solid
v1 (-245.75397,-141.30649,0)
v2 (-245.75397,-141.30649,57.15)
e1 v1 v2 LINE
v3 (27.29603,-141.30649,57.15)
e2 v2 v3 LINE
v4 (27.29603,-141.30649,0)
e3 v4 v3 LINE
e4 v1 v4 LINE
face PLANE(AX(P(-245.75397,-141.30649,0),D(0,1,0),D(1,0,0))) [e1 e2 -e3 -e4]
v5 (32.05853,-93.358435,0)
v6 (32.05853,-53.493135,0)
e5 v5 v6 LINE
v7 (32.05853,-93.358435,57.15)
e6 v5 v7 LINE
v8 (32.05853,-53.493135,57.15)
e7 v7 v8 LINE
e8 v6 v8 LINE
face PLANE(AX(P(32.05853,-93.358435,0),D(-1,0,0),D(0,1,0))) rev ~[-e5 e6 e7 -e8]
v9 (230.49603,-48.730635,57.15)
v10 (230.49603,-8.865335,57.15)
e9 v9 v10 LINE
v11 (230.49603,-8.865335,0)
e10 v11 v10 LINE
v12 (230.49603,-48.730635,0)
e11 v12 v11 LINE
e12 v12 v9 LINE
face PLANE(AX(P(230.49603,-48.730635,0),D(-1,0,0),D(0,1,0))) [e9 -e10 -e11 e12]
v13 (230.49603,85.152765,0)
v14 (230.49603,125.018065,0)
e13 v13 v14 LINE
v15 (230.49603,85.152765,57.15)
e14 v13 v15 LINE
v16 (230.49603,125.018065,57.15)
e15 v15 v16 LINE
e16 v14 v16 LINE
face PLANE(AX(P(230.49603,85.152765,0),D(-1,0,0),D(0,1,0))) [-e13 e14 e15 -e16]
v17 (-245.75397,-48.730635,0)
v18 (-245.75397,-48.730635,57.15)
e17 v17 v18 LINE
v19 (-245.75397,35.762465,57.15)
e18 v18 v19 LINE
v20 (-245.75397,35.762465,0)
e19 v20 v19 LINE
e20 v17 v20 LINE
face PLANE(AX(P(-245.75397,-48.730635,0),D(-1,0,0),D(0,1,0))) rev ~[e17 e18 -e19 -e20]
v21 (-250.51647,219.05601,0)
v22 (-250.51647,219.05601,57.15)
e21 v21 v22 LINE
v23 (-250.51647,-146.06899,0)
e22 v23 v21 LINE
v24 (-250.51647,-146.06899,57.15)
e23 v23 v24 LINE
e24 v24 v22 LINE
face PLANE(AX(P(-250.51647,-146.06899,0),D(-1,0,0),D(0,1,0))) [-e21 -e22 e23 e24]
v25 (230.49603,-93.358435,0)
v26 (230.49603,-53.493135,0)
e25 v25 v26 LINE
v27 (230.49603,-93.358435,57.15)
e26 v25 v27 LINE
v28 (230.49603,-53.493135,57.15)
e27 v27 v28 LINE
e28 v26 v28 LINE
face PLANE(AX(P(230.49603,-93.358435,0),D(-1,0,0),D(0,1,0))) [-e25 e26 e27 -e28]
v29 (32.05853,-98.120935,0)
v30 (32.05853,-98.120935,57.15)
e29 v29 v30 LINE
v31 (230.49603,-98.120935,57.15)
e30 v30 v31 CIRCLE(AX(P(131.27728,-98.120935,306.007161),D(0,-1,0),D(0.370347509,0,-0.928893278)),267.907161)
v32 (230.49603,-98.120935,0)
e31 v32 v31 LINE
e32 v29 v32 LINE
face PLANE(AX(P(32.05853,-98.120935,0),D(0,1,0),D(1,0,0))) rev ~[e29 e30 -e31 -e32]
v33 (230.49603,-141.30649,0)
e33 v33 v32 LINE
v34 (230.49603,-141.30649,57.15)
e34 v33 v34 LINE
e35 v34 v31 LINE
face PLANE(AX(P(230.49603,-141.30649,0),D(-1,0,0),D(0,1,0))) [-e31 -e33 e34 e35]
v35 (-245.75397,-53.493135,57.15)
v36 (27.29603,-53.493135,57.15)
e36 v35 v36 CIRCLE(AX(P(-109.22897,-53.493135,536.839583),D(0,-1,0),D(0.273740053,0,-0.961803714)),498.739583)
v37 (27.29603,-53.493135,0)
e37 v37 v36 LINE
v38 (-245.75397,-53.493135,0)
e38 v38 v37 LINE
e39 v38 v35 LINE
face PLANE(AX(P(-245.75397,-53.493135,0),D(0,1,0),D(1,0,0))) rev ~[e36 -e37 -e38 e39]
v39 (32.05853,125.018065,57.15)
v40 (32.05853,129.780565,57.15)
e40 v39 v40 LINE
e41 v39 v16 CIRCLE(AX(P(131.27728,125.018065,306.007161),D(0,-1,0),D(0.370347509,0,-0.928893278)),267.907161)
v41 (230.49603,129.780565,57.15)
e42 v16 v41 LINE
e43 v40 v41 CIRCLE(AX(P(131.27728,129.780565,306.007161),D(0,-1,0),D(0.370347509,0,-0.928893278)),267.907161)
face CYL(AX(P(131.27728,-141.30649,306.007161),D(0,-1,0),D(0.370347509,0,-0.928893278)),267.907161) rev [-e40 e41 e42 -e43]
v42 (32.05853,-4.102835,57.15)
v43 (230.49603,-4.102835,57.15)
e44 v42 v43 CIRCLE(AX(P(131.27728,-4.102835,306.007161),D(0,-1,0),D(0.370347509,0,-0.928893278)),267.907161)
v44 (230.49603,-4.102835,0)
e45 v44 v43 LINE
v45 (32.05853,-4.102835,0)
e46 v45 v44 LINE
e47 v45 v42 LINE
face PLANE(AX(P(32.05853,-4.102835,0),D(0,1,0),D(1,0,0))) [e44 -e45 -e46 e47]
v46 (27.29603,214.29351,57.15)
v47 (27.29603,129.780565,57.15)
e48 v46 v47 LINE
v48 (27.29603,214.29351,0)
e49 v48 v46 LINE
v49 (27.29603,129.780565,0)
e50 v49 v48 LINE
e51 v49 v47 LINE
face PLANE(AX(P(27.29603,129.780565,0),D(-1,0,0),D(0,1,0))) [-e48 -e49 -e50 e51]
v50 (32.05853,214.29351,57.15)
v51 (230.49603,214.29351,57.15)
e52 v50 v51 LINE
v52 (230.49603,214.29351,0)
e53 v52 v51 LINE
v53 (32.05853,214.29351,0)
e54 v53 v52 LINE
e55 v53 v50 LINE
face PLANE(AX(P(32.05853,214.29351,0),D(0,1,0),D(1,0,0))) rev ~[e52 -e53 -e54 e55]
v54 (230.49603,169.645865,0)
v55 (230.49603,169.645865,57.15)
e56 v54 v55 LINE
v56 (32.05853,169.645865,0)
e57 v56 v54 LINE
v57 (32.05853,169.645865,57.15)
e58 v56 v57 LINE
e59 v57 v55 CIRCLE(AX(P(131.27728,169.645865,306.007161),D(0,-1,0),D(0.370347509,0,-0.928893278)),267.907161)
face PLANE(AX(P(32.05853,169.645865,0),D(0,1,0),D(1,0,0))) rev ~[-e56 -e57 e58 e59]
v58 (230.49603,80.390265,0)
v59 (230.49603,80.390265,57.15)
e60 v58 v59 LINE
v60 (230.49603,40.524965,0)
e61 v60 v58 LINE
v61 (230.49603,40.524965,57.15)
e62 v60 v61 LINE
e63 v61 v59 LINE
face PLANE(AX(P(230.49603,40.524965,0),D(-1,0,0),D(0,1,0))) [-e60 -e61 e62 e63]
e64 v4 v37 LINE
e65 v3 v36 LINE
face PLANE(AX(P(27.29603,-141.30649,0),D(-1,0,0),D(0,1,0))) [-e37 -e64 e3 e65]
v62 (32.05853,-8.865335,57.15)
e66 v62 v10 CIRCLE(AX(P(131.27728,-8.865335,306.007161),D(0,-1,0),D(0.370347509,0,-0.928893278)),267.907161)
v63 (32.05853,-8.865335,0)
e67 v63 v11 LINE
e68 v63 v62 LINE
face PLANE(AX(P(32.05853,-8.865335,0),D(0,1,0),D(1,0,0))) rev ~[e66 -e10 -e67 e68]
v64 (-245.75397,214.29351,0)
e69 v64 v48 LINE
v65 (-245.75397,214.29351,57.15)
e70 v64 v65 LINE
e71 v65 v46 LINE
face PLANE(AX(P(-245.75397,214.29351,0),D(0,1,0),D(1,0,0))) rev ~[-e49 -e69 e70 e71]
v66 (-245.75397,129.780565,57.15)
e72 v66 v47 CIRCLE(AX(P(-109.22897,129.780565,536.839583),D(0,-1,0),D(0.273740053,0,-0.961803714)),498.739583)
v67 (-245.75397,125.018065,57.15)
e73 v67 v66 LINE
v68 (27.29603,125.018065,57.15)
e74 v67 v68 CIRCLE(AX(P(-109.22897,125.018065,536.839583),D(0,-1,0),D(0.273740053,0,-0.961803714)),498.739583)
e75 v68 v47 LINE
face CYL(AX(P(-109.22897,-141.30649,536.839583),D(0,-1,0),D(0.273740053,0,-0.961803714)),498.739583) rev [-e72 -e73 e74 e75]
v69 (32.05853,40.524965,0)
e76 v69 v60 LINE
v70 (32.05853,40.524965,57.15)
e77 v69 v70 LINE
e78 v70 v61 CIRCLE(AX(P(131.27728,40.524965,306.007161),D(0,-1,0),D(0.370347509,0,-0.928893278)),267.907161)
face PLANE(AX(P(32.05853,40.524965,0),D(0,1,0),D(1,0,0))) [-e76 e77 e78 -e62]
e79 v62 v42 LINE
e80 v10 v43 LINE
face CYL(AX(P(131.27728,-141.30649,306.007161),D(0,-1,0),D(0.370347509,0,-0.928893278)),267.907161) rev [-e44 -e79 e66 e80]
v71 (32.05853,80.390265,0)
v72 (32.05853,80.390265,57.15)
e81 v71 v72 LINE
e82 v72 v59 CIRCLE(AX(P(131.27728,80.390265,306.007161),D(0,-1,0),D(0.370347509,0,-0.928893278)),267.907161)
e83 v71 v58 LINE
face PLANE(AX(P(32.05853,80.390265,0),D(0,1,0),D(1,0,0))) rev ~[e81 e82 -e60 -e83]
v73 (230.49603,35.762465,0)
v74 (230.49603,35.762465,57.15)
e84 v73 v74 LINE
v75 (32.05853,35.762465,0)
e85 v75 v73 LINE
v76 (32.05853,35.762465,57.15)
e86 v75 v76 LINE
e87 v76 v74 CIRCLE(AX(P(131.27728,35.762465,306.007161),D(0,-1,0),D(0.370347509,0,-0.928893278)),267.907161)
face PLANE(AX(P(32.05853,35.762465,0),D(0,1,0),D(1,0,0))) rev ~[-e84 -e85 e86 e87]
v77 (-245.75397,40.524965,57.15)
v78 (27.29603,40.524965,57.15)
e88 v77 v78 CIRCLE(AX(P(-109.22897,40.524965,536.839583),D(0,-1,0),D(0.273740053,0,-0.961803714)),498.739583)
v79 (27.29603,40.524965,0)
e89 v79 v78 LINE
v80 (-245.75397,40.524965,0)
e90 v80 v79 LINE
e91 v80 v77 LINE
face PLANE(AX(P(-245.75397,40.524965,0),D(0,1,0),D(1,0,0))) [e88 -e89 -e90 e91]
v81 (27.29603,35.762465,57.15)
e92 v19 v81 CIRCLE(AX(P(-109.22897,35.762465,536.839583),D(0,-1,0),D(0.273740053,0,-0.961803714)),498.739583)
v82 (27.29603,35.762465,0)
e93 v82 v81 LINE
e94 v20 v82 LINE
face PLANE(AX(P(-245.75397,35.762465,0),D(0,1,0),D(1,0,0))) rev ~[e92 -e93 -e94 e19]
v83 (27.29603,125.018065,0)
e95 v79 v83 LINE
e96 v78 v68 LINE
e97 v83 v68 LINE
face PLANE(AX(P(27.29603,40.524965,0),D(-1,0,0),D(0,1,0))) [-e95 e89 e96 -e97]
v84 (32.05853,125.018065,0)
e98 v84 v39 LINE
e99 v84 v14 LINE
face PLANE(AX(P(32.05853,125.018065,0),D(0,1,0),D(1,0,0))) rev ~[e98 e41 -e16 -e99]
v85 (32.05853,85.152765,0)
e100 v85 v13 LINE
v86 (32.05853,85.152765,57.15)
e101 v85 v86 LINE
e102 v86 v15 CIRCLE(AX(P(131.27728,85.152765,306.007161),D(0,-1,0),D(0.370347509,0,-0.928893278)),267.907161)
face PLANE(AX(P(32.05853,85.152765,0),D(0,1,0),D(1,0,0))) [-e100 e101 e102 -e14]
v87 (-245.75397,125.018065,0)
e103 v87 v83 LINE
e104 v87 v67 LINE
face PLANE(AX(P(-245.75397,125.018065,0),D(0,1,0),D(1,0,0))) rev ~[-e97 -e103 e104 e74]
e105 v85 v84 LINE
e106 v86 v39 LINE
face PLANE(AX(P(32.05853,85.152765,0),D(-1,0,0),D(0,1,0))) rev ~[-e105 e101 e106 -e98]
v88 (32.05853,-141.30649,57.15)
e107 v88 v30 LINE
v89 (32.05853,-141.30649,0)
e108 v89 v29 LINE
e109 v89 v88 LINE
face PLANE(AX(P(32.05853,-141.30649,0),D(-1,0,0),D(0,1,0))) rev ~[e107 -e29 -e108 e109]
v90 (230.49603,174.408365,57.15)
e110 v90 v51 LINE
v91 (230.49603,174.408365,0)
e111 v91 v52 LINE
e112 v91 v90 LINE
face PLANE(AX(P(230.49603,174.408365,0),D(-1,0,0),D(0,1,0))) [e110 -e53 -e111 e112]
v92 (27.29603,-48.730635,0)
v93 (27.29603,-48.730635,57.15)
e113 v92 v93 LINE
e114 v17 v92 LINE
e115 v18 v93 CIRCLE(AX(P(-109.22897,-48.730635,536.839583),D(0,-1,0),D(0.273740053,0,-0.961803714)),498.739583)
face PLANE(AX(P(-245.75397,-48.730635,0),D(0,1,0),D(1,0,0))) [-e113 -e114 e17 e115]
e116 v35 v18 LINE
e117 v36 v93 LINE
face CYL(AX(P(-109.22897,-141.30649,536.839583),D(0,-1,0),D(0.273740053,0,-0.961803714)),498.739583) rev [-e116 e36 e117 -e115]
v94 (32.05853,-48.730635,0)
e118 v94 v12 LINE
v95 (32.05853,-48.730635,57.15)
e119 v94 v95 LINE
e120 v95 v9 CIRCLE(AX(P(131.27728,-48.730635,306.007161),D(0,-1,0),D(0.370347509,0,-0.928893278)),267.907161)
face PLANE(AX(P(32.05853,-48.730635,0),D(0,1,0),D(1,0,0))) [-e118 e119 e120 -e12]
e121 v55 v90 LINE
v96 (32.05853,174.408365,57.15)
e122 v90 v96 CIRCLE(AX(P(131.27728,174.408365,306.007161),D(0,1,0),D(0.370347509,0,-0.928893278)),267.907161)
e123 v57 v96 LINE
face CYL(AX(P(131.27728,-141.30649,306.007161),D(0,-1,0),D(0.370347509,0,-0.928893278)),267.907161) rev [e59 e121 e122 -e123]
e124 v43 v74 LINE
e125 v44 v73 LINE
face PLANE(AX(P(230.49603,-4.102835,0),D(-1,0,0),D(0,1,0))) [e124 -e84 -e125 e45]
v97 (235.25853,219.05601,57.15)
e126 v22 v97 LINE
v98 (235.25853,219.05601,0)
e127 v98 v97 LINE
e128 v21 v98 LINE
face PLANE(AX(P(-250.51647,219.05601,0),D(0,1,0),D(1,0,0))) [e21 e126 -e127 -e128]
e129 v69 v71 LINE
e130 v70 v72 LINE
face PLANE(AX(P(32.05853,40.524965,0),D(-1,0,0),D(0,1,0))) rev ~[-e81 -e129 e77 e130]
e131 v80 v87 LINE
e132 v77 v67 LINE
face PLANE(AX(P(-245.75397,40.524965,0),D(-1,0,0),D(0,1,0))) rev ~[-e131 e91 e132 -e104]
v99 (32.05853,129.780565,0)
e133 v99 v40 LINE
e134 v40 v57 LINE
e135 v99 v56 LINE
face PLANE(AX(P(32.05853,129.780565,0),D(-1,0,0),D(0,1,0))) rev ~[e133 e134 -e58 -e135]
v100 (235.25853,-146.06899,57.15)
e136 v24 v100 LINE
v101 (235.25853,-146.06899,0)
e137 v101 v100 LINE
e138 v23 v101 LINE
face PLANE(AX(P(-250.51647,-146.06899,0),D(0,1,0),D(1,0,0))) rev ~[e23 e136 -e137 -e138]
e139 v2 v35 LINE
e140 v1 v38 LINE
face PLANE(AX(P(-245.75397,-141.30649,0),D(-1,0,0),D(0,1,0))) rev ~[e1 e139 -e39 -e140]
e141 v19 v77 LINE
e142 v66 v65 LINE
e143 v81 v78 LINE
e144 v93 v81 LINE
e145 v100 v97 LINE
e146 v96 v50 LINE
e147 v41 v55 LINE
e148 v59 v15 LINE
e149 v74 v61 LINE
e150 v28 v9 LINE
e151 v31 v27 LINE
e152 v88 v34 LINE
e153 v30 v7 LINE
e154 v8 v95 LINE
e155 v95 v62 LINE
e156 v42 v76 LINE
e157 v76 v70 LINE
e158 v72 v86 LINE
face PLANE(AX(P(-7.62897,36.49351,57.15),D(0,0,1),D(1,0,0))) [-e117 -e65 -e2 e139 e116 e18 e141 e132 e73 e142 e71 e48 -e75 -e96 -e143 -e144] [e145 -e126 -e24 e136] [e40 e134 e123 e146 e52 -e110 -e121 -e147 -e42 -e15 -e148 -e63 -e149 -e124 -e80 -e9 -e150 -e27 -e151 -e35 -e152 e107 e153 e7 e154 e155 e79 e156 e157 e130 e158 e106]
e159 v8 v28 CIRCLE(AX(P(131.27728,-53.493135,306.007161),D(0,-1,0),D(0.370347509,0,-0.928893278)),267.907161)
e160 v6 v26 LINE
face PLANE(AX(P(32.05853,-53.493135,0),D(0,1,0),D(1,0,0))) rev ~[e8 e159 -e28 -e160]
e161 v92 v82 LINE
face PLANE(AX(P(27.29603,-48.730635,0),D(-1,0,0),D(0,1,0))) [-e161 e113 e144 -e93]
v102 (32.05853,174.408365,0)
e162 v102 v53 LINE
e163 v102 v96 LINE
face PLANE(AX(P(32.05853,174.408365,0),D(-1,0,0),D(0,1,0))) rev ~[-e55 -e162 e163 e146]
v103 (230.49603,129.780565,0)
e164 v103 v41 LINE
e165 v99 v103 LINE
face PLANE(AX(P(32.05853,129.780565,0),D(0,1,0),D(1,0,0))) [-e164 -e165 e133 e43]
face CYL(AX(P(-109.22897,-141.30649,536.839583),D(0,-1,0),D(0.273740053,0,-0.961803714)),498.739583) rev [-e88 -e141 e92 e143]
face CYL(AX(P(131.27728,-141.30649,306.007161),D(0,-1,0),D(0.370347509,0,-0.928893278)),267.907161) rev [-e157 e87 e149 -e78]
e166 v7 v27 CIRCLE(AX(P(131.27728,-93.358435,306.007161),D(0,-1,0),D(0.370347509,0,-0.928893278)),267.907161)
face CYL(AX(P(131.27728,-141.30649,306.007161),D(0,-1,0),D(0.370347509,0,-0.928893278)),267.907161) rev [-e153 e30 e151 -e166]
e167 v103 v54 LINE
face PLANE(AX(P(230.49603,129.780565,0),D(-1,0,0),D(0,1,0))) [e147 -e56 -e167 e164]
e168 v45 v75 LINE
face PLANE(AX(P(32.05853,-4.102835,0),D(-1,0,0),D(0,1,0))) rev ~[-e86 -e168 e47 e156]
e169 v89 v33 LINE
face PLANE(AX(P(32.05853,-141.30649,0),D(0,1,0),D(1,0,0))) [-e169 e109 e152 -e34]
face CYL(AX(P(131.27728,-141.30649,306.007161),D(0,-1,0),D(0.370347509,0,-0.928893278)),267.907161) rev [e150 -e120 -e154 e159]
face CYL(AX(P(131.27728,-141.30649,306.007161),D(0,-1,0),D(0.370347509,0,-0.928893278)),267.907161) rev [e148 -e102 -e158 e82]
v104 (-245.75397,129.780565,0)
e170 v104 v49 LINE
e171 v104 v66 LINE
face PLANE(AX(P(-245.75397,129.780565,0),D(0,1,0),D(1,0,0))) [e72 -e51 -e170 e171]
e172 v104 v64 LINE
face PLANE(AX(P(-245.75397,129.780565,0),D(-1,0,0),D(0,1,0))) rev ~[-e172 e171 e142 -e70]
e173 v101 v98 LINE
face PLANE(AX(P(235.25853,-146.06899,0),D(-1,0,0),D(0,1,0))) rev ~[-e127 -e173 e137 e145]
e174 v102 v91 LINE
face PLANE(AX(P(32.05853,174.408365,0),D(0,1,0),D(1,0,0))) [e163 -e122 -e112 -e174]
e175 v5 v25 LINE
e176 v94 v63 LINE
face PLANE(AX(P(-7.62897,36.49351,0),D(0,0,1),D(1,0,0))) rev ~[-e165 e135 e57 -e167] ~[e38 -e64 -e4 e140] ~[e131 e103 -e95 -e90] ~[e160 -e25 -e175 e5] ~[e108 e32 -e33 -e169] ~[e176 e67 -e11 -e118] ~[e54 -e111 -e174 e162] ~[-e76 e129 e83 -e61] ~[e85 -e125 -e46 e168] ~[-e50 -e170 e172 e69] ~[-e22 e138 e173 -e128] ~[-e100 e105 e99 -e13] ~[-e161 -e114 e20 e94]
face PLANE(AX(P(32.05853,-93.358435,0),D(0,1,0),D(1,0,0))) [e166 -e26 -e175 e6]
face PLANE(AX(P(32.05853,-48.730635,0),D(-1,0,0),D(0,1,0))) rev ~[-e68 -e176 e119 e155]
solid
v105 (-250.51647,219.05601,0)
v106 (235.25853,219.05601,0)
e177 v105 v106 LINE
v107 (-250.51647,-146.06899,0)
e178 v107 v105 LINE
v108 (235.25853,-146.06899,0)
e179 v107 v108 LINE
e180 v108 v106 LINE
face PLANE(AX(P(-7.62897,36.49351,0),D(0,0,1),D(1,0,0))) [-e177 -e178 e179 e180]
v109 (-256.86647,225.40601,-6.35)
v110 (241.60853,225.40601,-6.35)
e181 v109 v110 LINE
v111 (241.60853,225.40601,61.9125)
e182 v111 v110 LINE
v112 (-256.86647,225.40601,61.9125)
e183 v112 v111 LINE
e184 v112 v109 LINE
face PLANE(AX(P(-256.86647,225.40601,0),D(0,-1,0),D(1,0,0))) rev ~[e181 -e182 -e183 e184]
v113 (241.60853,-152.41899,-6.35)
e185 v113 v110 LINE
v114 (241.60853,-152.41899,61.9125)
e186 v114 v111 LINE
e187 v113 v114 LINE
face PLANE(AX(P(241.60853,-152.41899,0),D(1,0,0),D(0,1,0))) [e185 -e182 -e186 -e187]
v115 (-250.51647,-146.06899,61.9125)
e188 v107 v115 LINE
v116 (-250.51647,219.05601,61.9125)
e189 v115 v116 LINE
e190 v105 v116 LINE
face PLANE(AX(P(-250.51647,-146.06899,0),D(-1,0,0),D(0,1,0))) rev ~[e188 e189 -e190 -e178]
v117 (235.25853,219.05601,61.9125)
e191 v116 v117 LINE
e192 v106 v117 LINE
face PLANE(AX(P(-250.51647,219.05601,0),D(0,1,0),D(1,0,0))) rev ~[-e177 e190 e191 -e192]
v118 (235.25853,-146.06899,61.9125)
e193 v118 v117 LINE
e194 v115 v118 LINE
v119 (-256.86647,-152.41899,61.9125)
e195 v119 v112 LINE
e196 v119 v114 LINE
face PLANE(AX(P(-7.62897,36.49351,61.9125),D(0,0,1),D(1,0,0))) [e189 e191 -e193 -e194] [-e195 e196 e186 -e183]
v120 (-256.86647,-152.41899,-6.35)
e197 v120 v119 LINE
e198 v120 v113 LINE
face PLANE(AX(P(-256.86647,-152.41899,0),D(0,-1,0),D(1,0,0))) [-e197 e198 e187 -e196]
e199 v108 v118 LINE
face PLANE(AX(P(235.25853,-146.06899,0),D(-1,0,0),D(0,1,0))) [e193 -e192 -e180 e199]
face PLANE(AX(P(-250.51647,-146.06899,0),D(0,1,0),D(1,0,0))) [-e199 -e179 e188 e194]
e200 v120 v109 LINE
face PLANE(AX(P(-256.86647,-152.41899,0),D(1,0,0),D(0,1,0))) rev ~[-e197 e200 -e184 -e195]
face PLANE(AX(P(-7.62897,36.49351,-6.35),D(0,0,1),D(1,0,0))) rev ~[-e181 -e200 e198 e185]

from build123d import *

# Parameters (mm, degrees)
F0_W     = 485.775
F0_H     = 365.125
F0_W_2   = 273.05
F0_H_2   = 87.8133544401
F0_H_3   = 84.4931
F0_W_3   = 198.4375
F0_H_4   = 43.1855544401
F0_H_5   = 39.8653
F0_H_6   = 84.5129455599
F0_H_7   = 39.8851455599
F1_DEPTH = 57.15
F0_W_4   = 498.475
F0_H_8   = 377.825
F2_DEPTH = 61.9125
F5_DEPTH = 315.7148544401
F3_W     = 498.475
F3_H     = 377.825
F6_DEPTH = 6.35


with BuildPart() as f1:
    # F0 (on Top) → F1 (new body)
    with BuildSketch(Plane.XY):
        with Locations((-7.6289700516, 36.4935102986)):
            Rectangle(F0_W, F0_H)
        with Locations((-109.2289700516, -97.3998124813)):
            Rectangle(F0_W_2, F0_H_2, mode=Mode.SUBTRACT)
        with Locations((-109.2289700516, -6.4840852612)):
            Rectangle(F0_W_2, F0_H_3, mode=Mode.SUBTRACT)
        with Locations((131.2772799484, -119.7137124813)):
            Rectangle(F0_W_3, F0_H_4, mode=Mode.SUBTRACT)
        with Locations((131.2772799484, -73.4257852612)):
            Rectangle(F0_W_3, F0_H_5, mode=Mode.SUBTRACT)
        with Locations((131.2772799484, -28.7979852612)):
            Rectangle(F0_W_3, F0_H_5, mode=Mode.SUBTRACT)
        with Locations((131.2772799484, 15.8298147388)):
            Rectangle(F0_W_3, F0_H_5, mode=Mode.SUBTRACT)
        with Locations((-109.2289700516, 82.7715147388)):
            Rectangle(F0_W_2, F0_H_3, mode=Mode.SUBTRACT)
        with Locations((-109.2289700516, 172.0370375187)):
            Rectangle(F0_W_2, F0_H_6, mode=Mode.SUBTRACT)
        with Locations((131.2772799484, 60.4576147388)):
            Rectangle(F0_W_3, F0_H_5, mode=Mode.SUBTRACT)
        with Locations((131.2772799484, 105.0854147388)):
            Rectangle(F0_W_3, F0_H_5, mode=Mode.SUBTRACT)
        with Locations((131.2772799484, 149.7132147388)):
            Rectangle(F0_W_3, F0_H_5, mode=Mode.SUBTRACT)
        with Locations((131.2772799484, 194.3509375187)):
            Rectangle(F0_W_3, F0_H_7, mode=Mode.SUBTRACT)
    extrude(amount=F1_DEPTH)

    # F4 (on face) → F5 (cut, through all)
    with BuildSketch(Plane(origin=(0, -141.3064897014, 0), x_dir=(-1, 0, 0), z_dir=(0, 1, 0))):
        with BuildLine():
            Line((-32.0585299484, 57.15), (-230.4960299484, 57.15))
            ThreePointArc((-230.4960299484, 57.15), (-131.2772799484, 38.1), (-32.0585299484, 57.15))
        make_face()
        with BuildLine():
            ThreePointArc((-27.2960299484, 57.15), (109.2289700516, 38.1), (245.7539700516, 57.15))
            Line((245.7539700516, 57.15), (-27.2960299484, 57.15))
        make_face()
    extrude(amount=F5_DEPTH, mode=Mode.SUBTRACT)


with BuildPart() as f2:
    # F0 (on Top) → F2 (new body)
    with BuildSketch(Plane.XY):
        with Locations((-7.6289700516, 36.4935102986)):
            Rectangle(F0_W_4, F0_H_8)
        with Locations((-7.6289700516, 36.4935102986)):
            Rectangle(F0_W, F0_H, mode=Mode.SUBTRACT)
    extrude(amount=F2_DEPTH)

    # F3 (on face) → F6 (join)
    with BuildSketch(Plane.XY):
        with Locations((-7.6289700516, 36.4935102986)):
            Rectangle(F3_W, F3_H)
    extrude(amount=-F6_DEPTH)


solid = Compound([f1.part, f2.part])
